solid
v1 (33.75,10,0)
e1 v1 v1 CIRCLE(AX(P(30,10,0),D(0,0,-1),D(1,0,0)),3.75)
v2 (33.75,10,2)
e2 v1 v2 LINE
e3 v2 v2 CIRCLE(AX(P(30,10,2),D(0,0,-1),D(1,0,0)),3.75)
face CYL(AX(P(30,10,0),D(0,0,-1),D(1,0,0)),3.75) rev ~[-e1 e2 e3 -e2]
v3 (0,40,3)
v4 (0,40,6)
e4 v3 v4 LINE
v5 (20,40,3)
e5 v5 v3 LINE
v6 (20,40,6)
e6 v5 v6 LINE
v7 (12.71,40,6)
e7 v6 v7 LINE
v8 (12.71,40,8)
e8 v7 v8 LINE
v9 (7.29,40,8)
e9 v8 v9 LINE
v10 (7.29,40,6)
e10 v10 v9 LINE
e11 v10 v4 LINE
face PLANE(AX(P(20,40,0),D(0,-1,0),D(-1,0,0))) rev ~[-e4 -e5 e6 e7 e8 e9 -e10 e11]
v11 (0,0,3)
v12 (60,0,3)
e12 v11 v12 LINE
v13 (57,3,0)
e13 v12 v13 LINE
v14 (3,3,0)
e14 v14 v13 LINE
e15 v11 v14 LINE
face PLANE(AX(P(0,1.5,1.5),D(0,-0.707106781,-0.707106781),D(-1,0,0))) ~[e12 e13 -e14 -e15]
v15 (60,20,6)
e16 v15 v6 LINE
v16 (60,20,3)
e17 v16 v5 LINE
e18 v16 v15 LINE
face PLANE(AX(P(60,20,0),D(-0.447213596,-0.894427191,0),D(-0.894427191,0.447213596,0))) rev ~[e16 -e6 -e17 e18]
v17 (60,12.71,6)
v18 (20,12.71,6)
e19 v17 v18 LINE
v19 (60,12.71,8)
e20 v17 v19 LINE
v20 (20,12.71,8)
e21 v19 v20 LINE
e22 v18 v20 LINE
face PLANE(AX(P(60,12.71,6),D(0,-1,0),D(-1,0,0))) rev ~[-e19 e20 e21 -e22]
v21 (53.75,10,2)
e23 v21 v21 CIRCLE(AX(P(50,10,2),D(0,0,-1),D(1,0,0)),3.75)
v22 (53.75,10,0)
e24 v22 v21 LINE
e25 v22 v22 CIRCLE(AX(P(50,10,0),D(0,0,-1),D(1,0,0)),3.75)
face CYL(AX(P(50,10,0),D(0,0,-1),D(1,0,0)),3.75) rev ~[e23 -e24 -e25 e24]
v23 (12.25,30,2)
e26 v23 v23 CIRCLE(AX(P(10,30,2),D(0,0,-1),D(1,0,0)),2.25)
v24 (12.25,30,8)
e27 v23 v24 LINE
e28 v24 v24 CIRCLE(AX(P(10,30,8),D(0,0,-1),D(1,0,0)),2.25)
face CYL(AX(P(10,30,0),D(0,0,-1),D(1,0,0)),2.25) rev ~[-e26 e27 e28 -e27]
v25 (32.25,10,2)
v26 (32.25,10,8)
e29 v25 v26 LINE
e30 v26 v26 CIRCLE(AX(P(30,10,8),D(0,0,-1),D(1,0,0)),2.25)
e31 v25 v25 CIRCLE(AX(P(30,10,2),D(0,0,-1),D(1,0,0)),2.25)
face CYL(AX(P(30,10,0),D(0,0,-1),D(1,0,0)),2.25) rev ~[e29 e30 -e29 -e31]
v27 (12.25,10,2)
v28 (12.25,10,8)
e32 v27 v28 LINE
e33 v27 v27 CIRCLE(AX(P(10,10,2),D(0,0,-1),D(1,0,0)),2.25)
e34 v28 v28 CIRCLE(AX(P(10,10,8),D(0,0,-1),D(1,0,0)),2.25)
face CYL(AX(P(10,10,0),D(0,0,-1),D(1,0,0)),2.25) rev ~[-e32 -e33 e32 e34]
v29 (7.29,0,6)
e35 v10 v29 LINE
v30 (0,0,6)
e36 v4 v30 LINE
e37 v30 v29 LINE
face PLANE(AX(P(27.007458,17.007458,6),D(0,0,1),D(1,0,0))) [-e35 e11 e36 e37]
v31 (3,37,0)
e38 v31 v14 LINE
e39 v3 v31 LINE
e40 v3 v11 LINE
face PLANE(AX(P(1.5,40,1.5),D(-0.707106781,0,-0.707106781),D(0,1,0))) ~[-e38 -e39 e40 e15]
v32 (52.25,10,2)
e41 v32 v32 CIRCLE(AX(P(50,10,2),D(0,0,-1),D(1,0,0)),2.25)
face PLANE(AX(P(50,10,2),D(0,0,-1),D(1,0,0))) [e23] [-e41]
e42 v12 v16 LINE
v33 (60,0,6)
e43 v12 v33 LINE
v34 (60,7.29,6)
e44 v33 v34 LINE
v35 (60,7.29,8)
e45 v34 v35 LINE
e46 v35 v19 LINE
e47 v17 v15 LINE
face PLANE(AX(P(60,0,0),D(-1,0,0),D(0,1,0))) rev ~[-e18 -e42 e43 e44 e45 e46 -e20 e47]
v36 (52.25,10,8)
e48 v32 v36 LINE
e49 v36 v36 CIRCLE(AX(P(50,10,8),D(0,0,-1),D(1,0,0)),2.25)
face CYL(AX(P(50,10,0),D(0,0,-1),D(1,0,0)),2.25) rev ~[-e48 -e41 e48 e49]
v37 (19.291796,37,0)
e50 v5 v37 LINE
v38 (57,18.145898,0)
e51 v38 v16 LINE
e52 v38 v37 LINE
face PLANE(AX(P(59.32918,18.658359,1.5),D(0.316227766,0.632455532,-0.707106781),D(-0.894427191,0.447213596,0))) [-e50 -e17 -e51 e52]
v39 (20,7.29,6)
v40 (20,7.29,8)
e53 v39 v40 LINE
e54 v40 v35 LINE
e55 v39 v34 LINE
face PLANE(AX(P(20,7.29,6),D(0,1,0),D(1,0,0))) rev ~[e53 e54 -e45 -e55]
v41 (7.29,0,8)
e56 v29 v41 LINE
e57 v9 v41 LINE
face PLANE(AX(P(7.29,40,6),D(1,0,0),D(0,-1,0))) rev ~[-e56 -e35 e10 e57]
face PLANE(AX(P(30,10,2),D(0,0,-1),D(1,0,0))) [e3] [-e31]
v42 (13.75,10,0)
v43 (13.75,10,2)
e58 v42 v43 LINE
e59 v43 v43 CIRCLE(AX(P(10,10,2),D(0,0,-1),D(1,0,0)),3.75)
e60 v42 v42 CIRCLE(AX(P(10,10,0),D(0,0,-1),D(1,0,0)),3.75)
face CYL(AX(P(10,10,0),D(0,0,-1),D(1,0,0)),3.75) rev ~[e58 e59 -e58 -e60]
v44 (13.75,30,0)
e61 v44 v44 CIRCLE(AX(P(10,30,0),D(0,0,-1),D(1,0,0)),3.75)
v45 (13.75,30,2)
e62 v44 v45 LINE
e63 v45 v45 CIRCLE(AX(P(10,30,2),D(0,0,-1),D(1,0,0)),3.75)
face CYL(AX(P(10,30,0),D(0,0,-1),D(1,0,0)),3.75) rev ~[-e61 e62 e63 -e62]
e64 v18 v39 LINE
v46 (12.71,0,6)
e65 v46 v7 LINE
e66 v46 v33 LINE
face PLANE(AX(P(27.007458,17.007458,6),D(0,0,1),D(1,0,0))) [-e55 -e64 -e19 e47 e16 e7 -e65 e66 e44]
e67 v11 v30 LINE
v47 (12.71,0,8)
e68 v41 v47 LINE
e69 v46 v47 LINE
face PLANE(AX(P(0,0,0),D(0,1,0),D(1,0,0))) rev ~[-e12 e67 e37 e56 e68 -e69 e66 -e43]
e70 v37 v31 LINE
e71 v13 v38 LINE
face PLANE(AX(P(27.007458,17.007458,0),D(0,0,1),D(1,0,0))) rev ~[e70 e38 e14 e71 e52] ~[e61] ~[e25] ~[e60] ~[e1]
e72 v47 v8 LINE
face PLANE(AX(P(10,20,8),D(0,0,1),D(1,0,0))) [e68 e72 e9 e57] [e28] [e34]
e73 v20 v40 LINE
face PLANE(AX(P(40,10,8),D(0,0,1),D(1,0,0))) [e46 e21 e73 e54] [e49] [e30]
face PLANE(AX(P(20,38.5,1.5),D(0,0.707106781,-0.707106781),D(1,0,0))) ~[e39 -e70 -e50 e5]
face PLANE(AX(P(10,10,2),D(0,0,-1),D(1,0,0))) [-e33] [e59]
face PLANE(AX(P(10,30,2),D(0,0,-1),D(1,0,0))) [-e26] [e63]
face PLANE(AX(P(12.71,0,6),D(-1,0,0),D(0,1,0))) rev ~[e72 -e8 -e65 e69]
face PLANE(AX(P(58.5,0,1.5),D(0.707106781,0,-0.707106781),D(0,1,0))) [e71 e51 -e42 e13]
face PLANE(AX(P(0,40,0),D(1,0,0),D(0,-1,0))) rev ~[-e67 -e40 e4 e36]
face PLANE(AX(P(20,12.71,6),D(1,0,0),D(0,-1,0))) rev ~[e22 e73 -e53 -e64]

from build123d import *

# Parameters (mm, degrees)
F1_DEPTH = 6
F3_DEPTH = 2
F4_R     = 2.25
F5_DEPTH = 8.001
F6_R     = 3.75
F7_DEPTH = 2
F8_SIZE  = 3


with BuildPart() as f1:
    # F0 (on Top) → F1 (new body)
    with BuildSketch(Plane.XY):
        Polygon((0, 40), (0, 0), (60, 0), (60, 20), (20, 40), align=None)
    extrude(amount=F1_DEPTH)

    # F2 (on face) → F3 (join)
    with BuildSketch(Plane.XY.offset(6)):
        Polygon((12.71, 40), (7.29, 40), (7.29, 0), (10, 0), (12.71, 0), align=None)
        Polygon((60, 7.29), (60, 12.71), (20, 12.71), (20, 10), (20, 7.29), align=None)
    extrude(amount=F3_DEPTH)

    # F4 (on face) → F5 (cut, through all)
    with BuildSketch(Plane(origin=(0, 0, 0), x_dir=(1, 0, 0), z_dir=(0, 0, -1))):
        with Locations((10, -10)):
            Circle(F4_R)
        with Locations((50, -10)):
            Circle(F4_R)
        with Locations((10, -30)):
            Circle(F4_R)
        with Locations((30, -10)):
            Circle(F4_R)
    extrude(amount=-F5_DEPTH, mode=Mode.SUBTRACT)

    # F6 (on face) → F7 (cut)
    with BuildSketch(Plane(origin=(0, 0, 0), x_dir=(1, 0, 0), z_dir=(0, 0, -1))):
        with Locations((10, -10)):
            Circle(F6_R)
        with Locations((30, -10)):
            Circle(F6_R)
        with Locations((50, -10)):
            Circle(F6_R)
        with Locations((10, -30)):
            Circle(F6_R)
    extrude(amount=-F7_DEPTH, mode=Mode.SUBTRACT)

    # F8
    f8_edges = [f1.edges().sort_by_distance(p)[0] for p in [
        (30, 0, 0),
        (0, 20, 0),
        (60, 10, 0),
        (10, 40, 0),
        (40, 30, 0),
    ]]
    chamfer(f8_edges, length=F8_SIZE)


solid = f1.part
